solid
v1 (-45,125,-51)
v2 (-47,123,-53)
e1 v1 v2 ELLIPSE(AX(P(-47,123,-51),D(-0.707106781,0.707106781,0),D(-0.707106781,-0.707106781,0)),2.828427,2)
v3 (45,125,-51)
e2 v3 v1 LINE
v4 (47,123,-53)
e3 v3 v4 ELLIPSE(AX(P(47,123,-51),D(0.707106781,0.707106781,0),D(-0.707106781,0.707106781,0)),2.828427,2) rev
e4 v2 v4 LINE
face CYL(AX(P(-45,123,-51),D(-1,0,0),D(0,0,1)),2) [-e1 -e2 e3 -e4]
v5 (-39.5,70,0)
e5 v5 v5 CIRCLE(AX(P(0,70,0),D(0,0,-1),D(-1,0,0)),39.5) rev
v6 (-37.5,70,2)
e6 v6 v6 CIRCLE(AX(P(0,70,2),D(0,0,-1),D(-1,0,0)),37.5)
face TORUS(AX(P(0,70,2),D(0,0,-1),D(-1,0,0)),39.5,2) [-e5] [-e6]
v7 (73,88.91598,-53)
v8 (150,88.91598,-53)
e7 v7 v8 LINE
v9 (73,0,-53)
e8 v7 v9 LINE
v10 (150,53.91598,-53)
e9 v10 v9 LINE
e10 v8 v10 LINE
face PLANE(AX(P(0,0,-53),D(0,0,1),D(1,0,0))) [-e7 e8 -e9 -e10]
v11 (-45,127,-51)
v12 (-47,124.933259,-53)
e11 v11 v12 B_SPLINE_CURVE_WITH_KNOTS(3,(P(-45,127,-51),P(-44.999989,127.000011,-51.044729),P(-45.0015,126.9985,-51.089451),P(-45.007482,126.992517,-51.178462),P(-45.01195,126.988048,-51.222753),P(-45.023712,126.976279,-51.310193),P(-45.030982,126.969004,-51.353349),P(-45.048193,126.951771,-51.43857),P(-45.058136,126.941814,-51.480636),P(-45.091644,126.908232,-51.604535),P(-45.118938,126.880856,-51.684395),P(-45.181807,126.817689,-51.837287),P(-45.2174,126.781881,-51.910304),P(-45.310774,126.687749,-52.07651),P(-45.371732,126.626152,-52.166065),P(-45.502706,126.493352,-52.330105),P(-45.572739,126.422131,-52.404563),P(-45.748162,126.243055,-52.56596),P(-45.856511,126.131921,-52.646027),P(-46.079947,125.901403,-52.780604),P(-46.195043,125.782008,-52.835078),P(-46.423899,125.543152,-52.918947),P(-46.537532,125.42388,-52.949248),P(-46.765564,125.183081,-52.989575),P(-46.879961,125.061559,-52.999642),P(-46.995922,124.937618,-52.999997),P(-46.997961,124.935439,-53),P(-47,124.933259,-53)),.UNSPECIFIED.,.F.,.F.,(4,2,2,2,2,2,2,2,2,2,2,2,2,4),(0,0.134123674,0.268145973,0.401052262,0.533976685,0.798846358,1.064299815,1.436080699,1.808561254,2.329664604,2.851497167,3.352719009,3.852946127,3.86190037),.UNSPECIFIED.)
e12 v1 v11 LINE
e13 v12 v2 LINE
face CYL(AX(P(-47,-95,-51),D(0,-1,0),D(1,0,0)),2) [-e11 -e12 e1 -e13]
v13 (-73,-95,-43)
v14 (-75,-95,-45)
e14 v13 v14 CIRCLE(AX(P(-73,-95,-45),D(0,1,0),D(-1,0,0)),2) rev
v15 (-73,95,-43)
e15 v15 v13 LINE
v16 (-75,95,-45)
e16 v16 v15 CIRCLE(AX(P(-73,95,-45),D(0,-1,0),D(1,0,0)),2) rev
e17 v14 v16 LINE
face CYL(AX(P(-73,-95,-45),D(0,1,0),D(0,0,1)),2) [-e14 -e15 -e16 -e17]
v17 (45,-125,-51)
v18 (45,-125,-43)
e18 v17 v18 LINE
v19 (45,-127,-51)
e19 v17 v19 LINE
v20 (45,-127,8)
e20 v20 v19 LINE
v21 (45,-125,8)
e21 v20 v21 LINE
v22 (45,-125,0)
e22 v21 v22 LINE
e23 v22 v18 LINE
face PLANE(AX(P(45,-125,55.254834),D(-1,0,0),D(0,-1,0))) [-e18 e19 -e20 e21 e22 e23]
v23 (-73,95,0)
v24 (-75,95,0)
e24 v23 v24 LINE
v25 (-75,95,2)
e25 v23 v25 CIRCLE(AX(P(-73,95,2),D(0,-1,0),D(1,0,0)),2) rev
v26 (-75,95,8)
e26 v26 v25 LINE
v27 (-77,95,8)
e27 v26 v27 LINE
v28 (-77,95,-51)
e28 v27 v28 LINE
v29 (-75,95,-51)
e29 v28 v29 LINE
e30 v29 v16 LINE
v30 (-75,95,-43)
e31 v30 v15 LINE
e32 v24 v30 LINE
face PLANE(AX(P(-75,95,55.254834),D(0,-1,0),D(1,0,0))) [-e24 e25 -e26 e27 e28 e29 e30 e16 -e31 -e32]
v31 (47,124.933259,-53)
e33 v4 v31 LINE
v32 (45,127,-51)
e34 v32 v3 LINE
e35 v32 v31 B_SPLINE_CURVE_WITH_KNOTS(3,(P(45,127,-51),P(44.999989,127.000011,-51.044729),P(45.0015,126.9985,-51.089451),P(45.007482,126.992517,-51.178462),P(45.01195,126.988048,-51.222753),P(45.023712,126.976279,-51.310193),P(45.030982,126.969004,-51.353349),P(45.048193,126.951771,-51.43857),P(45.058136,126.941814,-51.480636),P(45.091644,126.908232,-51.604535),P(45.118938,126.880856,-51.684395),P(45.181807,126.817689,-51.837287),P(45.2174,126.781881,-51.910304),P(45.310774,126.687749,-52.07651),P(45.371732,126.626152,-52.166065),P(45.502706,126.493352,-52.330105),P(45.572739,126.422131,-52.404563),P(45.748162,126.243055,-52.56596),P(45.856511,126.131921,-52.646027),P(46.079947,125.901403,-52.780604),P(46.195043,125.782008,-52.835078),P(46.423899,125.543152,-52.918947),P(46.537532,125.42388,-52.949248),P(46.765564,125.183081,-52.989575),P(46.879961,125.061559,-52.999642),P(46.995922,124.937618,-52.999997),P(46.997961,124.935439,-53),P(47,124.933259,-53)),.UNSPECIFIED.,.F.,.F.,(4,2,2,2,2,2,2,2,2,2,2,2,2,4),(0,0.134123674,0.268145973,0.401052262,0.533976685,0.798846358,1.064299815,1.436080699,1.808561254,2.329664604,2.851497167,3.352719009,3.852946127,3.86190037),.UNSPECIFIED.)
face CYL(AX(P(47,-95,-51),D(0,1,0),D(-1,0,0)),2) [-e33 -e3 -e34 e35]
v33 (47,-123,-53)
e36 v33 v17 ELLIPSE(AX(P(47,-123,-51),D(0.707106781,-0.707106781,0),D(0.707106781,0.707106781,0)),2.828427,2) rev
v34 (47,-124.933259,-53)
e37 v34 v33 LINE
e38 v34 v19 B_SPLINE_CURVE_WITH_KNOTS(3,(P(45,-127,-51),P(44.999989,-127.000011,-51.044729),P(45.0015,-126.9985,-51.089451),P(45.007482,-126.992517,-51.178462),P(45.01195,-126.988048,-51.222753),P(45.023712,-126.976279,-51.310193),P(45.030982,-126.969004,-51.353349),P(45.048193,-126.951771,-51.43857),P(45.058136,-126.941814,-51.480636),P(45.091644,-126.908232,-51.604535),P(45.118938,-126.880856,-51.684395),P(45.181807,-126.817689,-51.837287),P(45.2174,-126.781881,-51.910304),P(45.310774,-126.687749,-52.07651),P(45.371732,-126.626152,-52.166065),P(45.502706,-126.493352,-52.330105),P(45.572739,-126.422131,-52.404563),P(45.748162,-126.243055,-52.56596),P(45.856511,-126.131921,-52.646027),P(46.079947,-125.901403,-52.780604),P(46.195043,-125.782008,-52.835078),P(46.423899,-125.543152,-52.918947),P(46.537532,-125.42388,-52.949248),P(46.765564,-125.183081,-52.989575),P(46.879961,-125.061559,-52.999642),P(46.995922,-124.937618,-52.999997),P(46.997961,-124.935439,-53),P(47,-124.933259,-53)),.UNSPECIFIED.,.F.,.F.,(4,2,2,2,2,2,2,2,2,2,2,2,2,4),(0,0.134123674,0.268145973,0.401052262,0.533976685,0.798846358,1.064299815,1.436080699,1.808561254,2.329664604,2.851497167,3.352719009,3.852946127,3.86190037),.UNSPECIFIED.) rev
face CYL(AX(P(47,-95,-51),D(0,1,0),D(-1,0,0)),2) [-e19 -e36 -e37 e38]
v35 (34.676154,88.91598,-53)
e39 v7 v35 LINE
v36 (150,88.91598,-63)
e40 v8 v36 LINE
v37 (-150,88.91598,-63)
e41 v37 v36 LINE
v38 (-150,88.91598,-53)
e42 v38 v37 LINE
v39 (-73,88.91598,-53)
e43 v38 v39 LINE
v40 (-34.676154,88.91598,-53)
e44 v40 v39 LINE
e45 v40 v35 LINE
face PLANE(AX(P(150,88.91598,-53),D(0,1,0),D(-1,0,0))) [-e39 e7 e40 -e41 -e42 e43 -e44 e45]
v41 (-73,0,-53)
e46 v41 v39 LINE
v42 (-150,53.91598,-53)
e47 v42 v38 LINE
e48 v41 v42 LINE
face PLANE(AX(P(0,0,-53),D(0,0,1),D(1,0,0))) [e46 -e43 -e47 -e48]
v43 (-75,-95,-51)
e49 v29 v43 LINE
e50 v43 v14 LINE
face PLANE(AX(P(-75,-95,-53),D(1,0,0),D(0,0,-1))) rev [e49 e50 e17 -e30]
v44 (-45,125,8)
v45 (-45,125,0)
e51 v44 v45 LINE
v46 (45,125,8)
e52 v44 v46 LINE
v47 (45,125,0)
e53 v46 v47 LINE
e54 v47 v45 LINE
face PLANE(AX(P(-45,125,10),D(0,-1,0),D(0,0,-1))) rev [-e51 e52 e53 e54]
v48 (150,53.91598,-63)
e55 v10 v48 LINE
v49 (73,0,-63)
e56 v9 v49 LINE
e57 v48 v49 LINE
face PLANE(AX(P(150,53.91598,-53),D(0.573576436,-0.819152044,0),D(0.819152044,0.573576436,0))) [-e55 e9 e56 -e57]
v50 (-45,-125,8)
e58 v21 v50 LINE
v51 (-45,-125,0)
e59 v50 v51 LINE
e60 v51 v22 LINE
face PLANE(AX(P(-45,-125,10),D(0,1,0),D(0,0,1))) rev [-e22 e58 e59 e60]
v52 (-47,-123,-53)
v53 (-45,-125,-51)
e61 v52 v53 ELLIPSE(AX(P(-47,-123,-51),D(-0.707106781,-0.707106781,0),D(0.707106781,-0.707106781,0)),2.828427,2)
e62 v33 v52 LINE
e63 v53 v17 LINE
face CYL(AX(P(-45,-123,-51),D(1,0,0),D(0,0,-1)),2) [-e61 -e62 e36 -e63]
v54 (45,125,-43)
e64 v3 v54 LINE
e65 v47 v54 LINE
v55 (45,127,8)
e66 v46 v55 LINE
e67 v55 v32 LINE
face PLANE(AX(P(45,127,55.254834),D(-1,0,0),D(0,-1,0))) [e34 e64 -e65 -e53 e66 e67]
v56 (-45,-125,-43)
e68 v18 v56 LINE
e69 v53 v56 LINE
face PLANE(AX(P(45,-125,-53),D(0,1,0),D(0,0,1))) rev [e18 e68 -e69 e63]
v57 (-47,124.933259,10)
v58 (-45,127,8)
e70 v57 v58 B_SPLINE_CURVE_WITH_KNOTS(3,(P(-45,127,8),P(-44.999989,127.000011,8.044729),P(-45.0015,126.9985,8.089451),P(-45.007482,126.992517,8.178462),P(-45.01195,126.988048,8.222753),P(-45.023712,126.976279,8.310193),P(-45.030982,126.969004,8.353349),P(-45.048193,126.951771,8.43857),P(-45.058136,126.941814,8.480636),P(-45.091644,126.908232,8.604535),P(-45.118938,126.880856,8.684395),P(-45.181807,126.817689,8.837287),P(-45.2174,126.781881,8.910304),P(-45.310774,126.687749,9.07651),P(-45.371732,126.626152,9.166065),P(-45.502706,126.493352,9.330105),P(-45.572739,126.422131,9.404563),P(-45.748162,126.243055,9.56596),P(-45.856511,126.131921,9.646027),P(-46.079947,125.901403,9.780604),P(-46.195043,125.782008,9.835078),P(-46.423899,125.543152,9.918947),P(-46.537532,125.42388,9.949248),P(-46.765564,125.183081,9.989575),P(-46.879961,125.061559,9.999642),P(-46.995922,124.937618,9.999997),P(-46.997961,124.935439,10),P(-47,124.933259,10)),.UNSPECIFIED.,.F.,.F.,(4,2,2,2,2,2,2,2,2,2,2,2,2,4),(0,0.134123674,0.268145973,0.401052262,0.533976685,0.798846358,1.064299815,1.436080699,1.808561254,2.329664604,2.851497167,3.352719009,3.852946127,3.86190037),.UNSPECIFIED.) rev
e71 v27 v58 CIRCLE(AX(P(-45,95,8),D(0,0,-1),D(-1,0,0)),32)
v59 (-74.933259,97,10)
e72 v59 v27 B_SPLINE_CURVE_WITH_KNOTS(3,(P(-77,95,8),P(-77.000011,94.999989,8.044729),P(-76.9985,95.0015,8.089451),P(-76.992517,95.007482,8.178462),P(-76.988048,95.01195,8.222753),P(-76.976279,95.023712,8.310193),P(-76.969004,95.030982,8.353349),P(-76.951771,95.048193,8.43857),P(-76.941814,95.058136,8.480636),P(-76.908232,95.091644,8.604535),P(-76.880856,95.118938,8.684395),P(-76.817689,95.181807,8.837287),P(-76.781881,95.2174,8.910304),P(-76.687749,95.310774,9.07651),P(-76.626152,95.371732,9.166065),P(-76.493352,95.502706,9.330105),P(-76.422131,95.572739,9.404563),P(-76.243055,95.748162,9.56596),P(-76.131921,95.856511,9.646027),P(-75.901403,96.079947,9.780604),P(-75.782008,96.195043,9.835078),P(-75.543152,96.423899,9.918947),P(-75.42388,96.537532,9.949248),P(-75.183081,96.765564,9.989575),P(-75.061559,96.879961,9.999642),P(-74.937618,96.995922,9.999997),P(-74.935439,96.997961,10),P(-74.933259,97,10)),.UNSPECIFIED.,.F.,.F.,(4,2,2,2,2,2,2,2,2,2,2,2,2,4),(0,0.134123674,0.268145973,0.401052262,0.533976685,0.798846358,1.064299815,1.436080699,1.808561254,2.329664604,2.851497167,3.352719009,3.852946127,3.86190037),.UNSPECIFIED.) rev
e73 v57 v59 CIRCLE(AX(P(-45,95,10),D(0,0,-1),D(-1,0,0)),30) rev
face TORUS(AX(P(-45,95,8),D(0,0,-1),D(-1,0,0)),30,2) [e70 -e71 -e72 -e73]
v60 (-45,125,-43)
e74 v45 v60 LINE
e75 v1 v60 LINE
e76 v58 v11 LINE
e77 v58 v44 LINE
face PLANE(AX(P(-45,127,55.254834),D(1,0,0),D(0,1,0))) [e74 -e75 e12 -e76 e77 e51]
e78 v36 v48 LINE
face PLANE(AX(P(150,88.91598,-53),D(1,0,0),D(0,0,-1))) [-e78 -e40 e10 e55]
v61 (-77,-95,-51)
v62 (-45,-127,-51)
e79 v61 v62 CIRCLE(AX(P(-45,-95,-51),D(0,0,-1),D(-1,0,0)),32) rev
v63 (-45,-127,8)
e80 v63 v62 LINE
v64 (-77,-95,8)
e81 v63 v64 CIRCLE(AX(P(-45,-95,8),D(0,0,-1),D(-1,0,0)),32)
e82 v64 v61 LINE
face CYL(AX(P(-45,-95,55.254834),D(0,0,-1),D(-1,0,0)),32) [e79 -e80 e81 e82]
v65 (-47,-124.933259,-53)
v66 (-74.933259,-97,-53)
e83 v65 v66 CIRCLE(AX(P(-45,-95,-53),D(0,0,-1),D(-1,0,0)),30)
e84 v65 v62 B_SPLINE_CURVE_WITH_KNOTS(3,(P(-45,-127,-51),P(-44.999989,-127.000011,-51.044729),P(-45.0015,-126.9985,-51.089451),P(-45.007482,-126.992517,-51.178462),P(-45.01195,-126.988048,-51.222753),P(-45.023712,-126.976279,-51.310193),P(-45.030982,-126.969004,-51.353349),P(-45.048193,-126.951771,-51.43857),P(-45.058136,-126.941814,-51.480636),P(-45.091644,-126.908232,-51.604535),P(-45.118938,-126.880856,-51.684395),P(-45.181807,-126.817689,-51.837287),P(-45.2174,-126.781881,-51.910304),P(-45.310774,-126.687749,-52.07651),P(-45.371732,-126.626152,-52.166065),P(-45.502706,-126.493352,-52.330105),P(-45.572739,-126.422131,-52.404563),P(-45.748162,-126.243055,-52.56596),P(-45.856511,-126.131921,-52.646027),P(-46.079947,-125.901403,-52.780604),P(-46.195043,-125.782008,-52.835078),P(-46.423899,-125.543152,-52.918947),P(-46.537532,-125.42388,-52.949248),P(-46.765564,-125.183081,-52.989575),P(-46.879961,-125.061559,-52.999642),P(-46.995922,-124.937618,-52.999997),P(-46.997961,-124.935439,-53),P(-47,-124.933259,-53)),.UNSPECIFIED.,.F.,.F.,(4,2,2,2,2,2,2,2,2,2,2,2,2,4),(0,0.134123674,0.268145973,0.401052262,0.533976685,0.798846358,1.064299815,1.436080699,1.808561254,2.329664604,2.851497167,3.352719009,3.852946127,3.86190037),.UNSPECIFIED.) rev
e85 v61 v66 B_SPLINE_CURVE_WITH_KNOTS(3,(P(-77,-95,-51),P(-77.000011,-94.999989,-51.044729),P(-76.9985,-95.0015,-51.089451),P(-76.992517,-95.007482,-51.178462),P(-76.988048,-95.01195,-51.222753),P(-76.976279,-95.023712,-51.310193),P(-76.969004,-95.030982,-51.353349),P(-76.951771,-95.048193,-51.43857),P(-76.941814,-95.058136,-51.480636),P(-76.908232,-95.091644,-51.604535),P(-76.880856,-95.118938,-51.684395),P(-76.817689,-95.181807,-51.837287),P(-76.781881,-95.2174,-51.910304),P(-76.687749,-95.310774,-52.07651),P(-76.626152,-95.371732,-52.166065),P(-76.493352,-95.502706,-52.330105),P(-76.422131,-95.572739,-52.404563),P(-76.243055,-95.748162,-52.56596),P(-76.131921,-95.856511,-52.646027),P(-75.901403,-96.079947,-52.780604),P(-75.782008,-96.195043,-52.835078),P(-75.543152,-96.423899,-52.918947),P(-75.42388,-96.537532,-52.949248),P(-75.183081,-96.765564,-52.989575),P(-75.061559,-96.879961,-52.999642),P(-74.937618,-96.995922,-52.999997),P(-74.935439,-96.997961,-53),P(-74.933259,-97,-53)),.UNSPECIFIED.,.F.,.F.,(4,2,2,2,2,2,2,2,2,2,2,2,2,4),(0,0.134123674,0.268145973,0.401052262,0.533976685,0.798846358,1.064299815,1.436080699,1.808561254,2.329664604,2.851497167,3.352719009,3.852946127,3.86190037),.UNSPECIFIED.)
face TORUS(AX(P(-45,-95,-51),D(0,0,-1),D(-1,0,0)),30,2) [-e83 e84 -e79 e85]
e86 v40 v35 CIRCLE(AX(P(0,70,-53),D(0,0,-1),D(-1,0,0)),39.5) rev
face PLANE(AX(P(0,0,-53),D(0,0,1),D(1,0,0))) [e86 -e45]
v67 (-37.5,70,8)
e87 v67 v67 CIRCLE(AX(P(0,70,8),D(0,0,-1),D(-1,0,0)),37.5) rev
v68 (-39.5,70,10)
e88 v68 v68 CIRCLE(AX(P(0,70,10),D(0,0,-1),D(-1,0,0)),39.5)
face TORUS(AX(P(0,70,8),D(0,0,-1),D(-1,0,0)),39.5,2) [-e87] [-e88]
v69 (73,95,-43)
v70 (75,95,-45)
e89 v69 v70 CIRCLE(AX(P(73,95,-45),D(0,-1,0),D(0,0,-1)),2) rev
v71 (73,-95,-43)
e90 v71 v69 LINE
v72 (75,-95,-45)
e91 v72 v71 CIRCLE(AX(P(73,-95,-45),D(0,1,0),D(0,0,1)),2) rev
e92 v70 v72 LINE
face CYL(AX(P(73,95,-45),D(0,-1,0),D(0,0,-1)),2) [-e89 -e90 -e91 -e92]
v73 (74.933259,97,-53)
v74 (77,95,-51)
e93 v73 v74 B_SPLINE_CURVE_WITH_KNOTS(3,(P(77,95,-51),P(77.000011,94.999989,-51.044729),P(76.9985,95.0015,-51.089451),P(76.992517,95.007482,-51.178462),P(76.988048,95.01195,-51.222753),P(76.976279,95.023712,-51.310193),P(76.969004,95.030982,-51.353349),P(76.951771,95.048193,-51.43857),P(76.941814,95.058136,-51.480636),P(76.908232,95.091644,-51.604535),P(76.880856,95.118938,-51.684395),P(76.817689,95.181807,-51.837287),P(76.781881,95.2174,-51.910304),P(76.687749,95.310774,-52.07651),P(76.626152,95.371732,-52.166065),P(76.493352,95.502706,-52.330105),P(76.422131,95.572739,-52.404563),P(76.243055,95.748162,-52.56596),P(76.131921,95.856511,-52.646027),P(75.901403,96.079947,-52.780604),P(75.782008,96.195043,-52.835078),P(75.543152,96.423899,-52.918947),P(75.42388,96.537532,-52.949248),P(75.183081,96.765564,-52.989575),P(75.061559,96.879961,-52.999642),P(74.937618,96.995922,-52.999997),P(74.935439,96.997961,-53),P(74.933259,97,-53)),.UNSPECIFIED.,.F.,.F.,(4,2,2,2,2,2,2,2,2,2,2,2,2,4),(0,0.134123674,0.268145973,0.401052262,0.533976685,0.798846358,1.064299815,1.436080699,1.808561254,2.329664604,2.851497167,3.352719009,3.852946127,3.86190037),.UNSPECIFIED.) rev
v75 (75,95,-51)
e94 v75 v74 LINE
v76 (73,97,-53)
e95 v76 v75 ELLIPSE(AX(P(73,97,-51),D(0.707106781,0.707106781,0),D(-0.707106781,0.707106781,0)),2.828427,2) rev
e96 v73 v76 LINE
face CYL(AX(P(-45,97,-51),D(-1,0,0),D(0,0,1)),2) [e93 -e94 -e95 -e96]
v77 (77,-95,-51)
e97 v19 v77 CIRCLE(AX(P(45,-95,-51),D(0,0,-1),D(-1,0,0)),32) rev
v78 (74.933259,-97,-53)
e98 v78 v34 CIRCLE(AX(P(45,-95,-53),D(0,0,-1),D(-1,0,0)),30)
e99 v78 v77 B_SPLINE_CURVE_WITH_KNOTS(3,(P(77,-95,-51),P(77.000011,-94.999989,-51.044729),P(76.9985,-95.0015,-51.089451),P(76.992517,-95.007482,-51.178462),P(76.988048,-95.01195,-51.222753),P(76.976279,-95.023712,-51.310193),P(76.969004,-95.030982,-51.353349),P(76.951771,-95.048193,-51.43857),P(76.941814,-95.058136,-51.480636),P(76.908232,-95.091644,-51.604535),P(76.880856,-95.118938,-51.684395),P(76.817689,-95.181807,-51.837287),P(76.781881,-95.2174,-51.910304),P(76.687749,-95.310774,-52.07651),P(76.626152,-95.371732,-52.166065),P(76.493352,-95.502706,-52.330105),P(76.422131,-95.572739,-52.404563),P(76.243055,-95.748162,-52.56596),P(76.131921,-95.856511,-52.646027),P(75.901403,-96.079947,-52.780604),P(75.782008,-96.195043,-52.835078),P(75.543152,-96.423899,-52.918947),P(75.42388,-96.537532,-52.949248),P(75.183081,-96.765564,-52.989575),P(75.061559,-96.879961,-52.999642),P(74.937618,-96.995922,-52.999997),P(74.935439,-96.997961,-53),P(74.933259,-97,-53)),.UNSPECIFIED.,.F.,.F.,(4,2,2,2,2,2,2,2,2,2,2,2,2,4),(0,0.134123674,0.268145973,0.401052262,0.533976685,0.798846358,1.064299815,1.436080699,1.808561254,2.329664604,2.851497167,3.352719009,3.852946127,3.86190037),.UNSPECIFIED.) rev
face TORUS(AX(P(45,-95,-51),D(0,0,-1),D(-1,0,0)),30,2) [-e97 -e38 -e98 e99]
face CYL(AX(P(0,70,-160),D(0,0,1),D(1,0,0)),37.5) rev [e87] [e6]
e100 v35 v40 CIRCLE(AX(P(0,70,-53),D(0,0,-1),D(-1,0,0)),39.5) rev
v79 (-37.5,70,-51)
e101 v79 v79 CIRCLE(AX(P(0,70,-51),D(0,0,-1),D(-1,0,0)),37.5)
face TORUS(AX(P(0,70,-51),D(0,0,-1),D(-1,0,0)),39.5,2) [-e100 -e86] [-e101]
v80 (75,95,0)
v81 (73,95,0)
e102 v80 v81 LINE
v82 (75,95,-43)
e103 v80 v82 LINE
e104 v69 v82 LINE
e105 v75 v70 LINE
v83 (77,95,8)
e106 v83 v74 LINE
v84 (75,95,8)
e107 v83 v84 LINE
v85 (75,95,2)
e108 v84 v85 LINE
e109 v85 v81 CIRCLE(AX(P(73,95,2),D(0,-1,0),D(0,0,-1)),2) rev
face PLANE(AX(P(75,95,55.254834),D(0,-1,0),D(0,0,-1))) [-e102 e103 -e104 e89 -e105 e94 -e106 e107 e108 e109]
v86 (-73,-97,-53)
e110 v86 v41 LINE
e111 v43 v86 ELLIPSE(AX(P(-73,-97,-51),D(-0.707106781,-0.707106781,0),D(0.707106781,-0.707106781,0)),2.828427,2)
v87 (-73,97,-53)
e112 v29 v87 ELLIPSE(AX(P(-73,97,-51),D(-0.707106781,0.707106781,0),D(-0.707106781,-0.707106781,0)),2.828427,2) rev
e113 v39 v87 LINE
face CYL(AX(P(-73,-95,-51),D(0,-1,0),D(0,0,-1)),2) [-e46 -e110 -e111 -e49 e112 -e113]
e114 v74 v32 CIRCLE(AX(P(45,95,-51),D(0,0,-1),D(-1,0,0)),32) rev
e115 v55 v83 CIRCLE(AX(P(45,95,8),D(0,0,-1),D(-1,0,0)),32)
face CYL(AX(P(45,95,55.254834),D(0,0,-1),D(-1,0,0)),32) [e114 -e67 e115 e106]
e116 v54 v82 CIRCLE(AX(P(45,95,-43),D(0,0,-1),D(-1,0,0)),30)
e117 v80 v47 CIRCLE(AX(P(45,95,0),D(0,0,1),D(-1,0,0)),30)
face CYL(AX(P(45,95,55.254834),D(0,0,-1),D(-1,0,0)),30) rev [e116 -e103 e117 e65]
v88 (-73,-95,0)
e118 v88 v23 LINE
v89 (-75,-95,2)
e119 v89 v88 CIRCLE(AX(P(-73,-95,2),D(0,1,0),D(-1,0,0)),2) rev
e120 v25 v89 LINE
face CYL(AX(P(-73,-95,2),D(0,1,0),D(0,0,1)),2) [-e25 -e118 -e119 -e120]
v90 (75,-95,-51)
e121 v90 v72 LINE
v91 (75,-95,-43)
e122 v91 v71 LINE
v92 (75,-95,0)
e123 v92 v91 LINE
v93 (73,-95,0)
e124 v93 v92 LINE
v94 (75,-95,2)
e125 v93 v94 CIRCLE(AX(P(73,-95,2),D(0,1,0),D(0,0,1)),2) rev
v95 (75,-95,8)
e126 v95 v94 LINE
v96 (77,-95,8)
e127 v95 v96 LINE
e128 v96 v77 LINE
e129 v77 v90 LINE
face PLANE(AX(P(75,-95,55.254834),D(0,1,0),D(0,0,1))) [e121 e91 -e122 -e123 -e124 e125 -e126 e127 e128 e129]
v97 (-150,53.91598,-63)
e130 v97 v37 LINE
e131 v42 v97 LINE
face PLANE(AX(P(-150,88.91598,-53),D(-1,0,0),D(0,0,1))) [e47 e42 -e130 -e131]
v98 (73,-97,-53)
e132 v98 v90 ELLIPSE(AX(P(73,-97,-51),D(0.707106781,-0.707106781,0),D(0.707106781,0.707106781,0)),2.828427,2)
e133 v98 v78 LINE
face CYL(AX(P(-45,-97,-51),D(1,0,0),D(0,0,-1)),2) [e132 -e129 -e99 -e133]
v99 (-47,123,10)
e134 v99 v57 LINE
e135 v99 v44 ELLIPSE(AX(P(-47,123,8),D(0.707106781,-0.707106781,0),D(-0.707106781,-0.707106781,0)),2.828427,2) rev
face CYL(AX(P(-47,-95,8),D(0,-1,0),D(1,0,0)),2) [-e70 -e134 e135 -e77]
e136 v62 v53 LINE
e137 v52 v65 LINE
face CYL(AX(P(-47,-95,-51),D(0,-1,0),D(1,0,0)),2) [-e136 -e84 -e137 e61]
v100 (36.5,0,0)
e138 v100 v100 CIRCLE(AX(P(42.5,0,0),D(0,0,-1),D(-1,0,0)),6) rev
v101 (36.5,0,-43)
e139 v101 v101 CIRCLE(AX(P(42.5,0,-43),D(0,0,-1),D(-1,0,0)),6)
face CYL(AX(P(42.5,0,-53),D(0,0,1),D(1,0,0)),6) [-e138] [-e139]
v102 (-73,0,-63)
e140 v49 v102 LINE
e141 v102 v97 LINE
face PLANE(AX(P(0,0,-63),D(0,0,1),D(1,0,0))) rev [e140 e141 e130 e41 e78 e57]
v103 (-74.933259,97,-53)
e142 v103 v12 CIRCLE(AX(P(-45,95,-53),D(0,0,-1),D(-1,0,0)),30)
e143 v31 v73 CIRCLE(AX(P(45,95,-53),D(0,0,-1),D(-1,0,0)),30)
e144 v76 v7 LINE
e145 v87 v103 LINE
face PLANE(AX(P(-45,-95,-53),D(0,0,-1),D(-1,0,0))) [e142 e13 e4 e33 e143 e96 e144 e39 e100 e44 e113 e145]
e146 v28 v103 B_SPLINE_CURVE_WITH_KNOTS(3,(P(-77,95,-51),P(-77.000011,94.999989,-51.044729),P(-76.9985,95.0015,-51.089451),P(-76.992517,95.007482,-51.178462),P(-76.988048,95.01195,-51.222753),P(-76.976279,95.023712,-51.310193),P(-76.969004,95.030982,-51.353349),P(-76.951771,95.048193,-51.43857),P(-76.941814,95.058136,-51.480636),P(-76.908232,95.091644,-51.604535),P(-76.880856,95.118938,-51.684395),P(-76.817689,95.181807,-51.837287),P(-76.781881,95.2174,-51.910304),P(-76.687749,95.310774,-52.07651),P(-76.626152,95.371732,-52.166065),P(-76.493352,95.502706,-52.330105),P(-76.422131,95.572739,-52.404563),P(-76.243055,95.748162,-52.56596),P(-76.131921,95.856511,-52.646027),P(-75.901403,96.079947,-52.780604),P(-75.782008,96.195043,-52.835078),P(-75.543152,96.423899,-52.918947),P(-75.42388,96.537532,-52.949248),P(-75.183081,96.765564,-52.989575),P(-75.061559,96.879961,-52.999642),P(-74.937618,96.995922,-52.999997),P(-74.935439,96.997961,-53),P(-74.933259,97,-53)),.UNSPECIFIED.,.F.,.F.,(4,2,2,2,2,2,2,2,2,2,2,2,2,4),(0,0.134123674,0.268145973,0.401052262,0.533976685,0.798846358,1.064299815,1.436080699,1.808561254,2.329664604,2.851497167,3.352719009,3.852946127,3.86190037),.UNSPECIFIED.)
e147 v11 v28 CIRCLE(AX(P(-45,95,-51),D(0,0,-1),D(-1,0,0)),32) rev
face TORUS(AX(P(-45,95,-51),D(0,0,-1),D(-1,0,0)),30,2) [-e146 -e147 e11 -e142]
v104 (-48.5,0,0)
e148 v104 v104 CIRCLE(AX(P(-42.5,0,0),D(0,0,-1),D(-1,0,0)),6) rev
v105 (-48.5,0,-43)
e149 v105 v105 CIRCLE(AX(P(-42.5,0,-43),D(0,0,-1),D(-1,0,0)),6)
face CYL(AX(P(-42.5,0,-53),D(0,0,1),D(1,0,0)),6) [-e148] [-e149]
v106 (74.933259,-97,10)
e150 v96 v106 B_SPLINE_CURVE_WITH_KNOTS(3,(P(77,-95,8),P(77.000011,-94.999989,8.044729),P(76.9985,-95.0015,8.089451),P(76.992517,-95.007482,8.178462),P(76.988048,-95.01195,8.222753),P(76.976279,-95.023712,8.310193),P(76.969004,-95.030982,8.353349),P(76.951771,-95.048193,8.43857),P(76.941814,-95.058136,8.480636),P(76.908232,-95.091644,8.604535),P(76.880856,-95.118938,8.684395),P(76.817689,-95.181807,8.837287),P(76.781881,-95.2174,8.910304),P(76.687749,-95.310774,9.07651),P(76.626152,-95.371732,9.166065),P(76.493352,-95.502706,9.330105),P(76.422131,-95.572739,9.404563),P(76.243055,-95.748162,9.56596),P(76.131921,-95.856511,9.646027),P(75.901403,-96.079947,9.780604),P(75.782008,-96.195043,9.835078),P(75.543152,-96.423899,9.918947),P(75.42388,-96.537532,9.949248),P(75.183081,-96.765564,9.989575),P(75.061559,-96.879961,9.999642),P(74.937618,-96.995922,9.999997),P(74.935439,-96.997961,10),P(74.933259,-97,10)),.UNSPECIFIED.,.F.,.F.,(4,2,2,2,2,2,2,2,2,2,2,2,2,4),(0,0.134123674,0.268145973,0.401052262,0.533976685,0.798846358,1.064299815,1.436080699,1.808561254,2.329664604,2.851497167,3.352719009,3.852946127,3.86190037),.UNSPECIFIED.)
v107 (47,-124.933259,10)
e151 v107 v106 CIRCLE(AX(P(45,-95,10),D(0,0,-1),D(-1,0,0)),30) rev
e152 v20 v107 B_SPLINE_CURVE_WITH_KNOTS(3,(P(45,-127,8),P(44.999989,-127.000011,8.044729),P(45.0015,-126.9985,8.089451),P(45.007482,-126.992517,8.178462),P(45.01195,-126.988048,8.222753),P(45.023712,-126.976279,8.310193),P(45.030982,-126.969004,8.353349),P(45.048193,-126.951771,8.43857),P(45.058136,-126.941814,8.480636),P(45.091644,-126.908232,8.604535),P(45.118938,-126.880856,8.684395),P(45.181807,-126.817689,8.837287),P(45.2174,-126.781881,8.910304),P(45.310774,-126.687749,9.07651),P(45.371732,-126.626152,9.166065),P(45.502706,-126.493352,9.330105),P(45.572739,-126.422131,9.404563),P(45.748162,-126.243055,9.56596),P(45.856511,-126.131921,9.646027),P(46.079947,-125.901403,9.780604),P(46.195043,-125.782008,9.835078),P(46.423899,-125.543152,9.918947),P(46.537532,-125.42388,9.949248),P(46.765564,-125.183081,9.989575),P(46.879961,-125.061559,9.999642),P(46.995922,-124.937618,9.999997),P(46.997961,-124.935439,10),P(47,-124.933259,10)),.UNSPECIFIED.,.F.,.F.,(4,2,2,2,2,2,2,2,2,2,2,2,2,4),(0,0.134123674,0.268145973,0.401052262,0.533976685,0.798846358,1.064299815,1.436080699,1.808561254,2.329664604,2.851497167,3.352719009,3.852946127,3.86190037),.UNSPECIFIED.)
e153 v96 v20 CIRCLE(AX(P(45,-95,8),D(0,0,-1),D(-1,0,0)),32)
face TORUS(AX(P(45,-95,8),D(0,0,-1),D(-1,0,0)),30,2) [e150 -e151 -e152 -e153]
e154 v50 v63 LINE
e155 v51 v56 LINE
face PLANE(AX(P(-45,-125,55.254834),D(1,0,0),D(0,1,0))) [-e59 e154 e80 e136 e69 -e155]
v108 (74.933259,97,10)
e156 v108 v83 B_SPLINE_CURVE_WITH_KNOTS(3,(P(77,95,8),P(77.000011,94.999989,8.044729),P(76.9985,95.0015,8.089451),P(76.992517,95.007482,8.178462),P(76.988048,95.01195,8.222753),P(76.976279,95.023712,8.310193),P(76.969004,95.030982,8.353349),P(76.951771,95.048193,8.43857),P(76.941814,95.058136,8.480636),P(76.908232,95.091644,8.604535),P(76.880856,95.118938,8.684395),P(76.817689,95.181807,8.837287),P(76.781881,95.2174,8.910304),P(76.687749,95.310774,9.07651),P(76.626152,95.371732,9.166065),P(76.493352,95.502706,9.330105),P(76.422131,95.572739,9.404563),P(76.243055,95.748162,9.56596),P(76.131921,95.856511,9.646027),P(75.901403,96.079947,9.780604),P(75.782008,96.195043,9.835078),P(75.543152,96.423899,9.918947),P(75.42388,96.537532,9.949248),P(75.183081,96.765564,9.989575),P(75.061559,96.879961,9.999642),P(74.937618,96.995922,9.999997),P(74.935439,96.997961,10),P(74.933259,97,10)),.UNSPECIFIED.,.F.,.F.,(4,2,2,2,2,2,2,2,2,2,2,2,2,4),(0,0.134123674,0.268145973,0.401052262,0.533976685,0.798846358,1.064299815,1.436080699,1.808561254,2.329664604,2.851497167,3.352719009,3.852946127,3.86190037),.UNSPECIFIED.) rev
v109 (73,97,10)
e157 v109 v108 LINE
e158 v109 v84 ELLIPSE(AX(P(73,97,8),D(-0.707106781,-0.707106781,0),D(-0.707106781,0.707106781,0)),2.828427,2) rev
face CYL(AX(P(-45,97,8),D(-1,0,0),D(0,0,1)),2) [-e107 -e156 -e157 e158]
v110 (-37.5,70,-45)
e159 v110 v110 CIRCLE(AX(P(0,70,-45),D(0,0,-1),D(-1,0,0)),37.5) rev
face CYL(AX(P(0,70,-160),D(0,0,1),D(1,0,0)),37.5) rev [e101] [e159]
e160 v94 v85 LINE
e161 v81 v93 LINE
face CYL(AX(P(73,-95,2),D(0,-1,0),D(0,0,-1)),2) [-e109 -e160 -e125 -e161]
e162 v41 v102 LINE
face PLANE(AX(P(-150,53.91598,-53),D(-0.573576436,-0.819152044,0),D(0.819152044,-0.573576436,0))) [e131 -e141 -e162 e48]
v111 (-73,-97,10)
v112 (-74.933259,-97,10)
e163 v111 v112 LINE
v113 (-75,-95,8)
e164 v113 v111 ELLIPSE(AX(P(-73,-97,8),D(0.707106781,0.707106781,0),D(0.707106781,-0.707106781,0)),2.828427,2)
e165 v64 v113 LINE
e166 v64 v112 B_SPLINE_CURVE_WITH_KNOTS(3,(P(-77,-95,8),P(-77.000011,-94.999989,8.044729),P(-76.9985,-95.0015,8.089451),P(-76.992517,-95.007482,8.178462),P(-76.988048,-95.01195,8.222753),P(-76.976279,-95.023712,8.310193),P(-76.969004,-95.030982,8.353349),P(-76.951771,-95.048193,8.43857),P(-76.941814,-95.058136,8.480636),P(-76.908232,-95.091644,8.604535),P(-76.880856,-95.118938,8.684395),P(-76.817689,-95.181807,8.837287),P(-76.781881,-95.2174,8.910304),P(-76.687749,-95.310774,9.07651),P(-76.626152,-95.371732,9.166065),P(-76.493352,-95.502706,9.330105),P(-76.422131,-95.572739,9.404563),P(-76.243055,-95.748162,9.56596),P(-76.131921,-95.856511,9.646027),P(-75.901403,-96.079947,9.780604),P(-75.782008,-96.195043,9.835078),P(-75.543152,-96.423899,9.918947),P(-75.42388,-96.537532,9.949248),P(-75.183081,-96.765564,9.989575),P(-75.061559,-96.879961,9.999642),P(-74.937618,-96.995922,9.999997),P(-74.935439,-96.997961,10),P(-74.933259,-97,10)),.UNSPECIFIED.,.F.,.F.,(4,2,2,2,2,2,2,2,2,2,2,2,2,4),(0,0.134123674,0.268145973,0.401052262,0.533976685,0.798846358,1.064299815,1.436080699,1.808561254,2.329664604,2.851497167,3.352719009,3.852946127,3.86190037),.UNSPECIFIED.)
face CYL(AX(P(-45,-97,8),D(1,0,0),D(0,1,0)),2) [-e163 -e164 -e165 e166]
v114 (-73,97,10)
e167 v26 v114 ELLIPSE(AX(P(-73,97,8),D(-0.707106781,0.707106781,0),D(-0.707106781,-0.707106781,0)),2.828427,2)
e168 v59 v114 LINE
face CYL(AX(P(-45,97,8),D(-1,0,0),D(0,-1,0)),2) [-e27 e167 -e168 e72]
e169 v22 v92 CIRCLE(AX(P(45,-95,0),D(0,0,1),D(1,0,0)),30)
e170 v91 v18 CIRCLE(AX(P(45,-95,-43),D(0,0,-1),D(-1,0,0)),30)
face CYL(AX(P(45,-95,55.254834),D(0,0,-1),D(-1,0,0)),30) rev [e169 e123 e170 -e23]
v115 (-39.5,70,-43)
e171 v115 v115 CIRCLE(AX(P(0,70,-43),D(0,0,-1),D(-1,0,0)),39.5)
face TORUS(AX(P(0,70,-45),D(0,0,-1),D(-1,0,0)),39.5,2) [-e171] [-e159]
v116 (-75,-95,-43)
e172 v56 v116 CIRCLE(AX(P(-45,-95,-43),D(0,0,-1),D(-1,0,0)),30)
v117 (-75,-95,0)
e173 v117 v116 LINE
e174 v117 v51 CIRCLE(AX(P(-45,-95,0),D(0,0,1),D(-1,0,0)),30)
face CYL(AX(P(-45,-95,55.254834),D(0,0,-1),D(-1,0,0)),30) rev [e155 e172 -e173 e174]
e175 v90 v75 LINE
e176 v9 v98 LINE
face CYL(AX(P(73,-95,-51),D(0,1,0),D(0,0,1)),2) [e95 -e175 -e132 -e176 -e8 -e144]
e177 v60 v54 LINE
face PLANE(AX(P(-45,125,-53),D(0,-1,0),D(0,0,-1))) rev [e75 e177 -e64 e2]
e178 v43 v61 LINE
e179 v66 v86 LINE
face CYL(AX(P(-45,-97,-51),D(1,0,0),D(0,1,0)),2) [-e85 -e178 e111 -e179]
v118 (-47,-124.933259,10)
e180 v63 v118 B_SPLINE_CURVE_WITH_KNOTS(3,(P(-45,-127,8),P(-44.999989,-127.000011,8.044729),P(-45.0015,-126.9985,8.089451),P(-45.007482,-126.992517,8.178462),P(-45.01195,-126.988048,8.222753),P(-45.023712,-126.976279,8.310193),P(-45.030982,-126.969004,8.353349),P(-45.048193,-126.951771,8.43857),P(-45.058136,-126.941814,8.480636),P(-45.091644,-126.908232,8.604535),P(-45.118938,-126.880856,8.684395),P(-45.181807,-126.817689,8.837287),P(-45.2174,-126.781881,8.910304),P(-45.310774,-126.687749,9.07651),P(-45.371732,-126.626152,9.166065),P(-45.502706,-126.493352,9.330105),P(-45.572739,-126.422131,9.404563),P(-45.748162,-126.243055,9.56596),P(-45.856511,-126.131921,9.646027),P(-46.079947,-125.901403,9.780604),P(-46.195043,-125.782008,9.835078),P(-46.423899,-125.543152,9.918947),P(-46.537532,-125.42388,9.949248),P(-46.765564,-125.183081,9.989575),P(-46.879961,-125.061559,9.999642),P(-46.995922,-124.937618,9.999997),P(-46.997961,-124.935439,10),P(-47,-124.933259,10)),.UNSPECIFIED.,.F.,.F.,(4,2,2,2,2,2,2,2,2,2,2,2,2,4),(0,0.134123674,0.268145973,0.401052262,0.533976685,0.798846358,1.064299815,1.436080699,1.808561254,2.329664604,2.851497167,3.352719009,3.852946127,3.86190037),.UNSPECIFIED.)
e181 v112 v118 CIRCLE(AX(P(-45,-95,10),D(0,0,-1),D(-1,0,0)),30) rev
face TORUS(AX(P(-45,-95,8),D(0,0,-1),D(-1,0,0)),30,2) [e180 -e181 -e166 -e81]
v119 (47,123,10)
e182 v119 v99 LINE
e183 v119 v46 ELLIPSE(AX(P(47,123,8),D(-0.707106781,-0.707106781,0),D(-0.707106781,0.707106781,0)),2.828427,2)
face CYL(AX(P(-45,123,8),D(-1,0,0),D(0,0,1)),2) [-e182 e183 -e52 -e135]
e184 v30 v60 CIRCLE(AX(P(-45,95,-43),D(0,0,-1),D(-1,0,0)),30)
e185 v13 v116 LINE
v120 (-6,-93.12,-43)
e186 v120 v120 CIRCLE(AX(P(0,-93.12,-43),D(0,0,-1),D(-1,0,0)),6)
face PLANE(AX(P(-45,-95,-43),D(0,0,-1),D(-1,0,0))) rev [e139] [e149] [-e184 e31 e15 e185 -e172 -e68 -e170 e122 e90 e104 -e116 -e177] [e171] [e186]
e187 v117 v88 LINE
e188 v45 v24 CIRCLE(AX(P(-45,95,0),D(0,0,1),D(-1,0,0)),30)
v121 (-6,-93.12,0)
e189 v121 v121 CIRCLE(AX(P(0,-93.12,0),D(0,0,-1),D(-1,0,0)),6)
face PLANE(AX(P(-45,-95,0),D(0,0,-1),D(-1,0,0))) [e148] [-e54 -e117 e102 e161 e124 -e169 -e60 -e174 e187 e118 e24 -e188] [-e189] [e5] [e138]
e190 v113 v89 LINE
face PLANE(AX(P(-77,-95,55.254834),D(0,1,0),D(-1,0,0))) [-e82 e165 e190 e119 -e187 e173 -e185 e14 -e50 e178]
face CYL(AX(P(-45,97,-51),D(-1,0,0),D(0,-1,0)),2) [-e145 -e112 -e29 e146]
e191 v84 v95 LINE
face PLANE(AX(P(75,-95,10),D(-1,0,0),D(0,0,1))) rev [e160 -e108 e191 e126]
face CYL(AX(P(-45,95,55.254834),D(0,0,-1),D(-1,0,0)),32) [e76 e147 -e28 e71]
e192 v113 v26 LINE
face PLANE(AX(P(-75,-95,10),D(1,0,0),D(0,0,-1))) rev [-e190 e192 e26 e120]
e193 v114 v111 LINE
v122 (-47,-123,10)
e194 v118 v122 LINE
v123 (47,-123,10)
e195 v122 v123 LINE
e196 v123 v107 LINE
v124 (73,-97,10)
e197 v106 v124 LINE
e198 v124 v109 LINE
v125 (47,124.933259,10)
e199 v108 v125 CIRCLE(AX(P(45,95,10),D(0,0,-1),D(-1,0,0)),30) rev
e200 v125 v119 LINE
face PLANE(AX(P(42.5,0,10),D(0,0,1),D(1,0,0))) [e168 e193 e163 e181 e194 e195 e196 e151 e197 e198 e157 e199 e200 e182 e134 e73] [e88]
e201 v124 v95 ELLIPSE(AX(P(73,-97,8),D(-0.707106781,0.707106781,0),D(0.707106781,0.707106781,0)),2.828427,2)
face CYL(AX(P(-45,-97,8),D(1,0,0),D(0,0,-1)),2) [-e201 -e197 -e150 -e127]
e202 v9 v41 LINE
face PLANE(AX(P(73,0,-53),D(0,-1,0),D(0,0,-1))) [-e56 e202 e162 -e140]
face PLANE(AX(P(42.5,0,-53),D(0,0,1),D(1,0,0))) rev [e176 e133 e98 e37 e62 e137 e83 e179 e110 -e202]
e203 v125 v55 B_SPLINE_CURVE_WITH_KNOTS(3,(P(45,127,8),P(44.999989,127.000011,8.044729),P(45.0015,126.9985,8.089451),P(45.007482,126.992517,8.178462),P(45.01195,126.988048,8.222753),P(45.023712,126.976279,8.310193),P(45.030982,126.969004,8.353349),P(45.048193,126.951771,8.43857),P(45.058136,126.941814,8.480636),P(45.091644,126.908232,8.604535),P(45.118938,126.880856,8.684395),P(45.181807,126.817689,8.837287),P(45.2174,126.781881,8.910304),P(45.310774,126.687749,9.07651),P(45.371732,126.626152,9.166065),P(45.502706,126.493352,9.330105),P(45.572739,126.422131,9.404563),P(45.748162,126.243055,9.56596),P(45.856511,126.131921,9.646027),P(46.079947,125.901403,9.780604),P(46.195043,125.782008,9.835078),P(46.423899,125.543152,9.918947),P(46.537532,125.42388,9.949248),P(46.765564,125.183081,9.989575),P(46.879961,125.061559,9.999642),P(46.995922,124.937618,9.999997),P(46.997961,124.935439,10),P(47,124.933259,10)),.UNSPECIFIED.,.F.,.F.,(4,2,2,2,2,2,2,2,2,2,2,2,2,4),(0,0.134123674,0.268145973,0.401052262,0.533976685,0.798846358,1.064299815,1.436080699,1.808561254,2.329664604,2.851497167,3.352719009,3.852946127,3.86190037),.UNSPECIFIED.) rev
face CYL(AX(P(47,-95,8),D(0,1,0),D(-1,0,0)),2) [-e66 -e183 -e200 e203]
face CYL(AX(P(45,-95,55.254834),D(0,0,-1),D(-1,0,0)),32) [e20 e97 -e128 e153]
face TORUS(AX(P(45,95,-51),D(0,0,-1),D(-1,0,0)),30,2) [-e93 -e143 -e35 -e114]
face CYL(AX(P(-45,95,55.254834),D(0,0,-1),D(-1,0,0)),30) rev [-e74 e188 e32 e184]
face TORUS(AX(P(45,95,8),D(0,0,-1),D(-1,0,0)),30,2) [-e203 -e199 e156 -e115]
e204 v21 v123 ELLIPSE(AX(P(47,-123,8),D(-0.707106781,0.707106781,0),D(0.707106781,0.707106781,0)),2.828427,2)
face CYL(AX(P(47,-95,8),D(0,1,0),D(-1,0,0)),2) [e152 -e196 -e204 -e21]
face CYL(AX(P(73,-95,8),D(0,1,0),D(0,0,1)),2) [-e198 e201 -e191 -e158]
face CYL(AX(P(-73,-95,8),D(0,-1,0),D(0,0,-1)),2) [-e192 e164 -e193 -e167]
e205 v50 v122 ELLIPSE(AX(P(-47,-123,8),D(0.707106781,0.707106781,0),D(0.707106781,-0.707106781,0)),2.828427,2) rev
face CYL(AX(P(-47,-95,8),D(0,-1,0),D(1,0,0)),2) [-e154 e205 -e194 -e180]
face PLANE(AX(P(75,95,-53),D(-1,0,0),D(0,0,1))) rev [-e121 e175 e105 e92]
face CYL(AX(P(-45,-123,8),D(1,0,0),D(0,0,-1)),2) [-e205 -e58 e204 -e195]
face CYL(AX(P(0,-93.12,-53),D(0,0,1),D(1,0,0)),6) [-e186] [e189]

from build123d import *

# Parameters (mm, degrees)
BOSS_EXTRUDE1_DEPTH       = 10
BOSS_EXTRUDE2_DEPTH       = 10
SKETCH5_R                 = 37.5
CUT_EXTRUDE1_DEPTH        = 170
FILLET1_R                 = 2
FILLET2_R                 = 2
BOSS_EXTRUDE3_REACH       = 160.805
FILLET3_R                 = 2
FILLET4_R                 = 2
FILLET8_R                 = 2
SKETCH8_R                 = 6
CUT_EXTRUDE4_DEPTH        = 101
SKETCH19_R                = 6
BOSS_EXTRUDE11_DEPTH      = 63
BOSS_EXTRUDE11_2_DEPTH    = 63
BOSS_EXTRUDE12_DEPTH      = 43
BOSS_EXTRUDE12_DEPTH_BACK = 10
SKETCH20_R                = 6
BOSS_EXTRUDE13_START      = 63
BOSS_EXTRUDE13_DEPTH      = 10


# Some blends are built 0.0001 mm under size
with BuildPart() as part:
    # Sketch2 → Boss-Extrude1 (new body)
    with BuildSketch(Plane.XY):
        with BuildLine():
            Line((-45, -125), (45, -125))
            ThreePointArc((45, -125), (66.213203436, -116.213203436), (75, -95))
            Line((75, -95), (75, 95))
            ThreePointArc((75, 95), (66.213203436, 116.213203436), (45, 125))
            Line((45, 125), (-45, 125))
            ThreePointArc((-45, 125), (-66.213203436, 116.213203436), (-75, 95))
            Line((-75, 95), (-75, -95))
            ThreePointArc((-75, -95), (-66.213203436, -116.213203436), (-45, -125))
        make_face()
    extrude(amount=BOSS_EXTRUDE1_DEPTH)


with BuildPart() as body_2:
    # Sketch4 → Boss-Extrude2 (new body)
    with BuildSketch(Plane(origin=(0, 0, -43), x_dir=(-1, 0, 0), z_dir=(0, 0, -1))):
        with BuildLine():
            Line((75, -95), (75, 95))
            ThreePointArc((75, 95), (66.213203436, 116.213203436), (45, 125))
            Line((45, 125), (-45, 125))
            ThreePointArc((-45, 125), (-66.213203436, 116.213203436), (-75, 95))
            Line((-75, 95), (-75, -95))
            ThreePointArc((-75, -95), (-66.213203436, -116.213203436), (-45, -125))
            Line((-45, -125), (45, -125))
            ThreePointArc((45, -125), (66.213203436, -116.213203436), (75, -95))
        make_face()
    extrude(amount=BOSS_EXTRUDE2_DEPTH)


with BuildPart() as cut_extrude1_tool:
    # Sketch5 → Cut-Extrude1 (new body)
    with BuildSketch(Plane.XY.offset(10)):
        with Locations((0, 70)):
            Circle(SKETCH5_R)
    extrude(amount=-CUT_EXTRUDE1_DEPTH)


with BuildPart() as part_1:
    add(part.part)

    # Cut-Extrude1: cut by cut_extrude1_tool
    add(cut_extrude1_tool.part, mode=Mode.SUBTRACT)

    # Fillet1
    fillet1_edges = [part_1.edges().sort_by_distance(p)[0] for p in [
        (-37.5, 70, 0),
        (-37.5, 70, 10),
    ]]
    fillet(fillet1_edges, radius=FILLET1_R)

    # Boss-Extrude3: up to this face of the body (flat: up to its plane)
    boss_extrude3_end = Plane(part_1.part.faces().sort_by_distance((0, -10.781104943, 10))[0])
    # Sketch6 → Boss-Extrude3 (add, up to the picked face)
    with BuildSketch(Plane(origin=(0, 0, -53), x_dir=(-1, 0, 0), z_dir=(0, 0, -1)), mode=Mode.PRIVATE) as boss_extrude3_sk1:
        with BuildLine():
            Line((-45, 127), (-45, 125))
            ThreePointArc((-45, 125), (-66.213203436, 116.213203436), (-75, 95))
            Line((-75, 95), (-77, 95))
            ThreePointArc((-77, 95), (-67.627416998, 117.627416998), (-45, 127))
        make_face()
    boss_extrude3_tool1 = split(extrude(boss_extrude3_sk1.sketch, amount=-BOSS_EXTRUDE3_REACH, mode=Mode.PRIVATE), bisect_by=boss_extrude3_end, keep=Keep.BOTH, mode=Mode.PRIVATE)
    # Sketch6 → Boss-Extrude3 (add, up to the picked face)
    with BuildSketch(Plane(origin=(0, 0, -53), x_dir=(-1, 0, 0), z_dir=(0, 0, -1)), mode=Mode.PRIVATE) as boss_extrude3_sk2:
        with BuildLine():
            Line((45, 127), (45, 125))
            ThreePointArc((45, 125), (66.213203436, 116.213203436), (75, 95))
            Line((75, 95), (77, 95))
            ThreePointArc((77, 95), (67.627416998, 117.627416998), (45, 127))
        make_face()
    boss_extrude3_tool2 = split(extrude(boss_extrude3_sk2.sketch, amount=-BOSS_EXTRUDE3_REACH, mode=Mode.PRIVATE), bisect_by=boss_extrude3_end, keep=Keep.BOTH, mode=Mode.PRIVATE)
    # Sketch6 → Boss-Extrude3 (add, up to the picked face)
    with BuildSketch(Plane(origin=(0, 0, -53), x_dir=(-1, 0, 0), z_dir=(0, 0, -1)), mode=Mode.PRIVATE) as boss_extrude3_sk3:
        with BuildLine():
            Line((77, -95), (75, -95))
            ThreePointArc((75, -95), (66.213203436, -116.213203436), (45, -125))
            Line((45, -125), (45, -127))
            ThreePointArc((45, -127), (67.627416998, -117.627416998), (77, -95))
        make_face()
    boss_extrude3_tool3 = split(extrude(boss_extrude3_sk3.sketch, amount=-BOSS_EXTRUDE3_REACH, mode=Mode.PRIVATE), bisect_by=boss_extrude3_end, keep=Keep.BOTH, mode=Mode.PRIVATE)
    # Sketch6 → Boss-Extrude3 (add, up to the picked face)
    with BuildSketch(Plane(origin=(0, 0, -53), x_dir=(-1, 0, 0), z_dir=(0, 0, -1)), mode=Mode.PRIVATE) as boss_extrude3_sk4:
        with BuildLine():
            Line((-75, -95), (-77, -95))
            ThreePointArc((-77, -95), (-67.627416998, -117.627416998), (-45, -127))
            Line((-45, -127), (-45, -125))
            ThreePointArc((-45, -125), (-66.213203436, -116.213203436), (-75, -95))
        make_face()
    boss_extrude3_tool4 = split(extrude(boss_extrude3_sk4.sketch, amount=-BOSS_EXTRUDE3_REACH, mode=Mode.PRIVATE), bisect_by=boss_extrude3_end, keep=Keep.BOTH, mode=Mode.PRIVATE)


with BuildPart() as body_2_1:
    add(body_2.part)

    # Cut-Extrude1: cut by cut_extrude1_tool
    add(cut_extrude1_tool.part, mode=Mode.SUBTRACT)

    # Fillet2
    fillet2_edges = [body_2_1.edges().sort_by_distance(p)[0] for p in [
        (-37.5, 70, -53),
        (-37.5, 70, -43),
    ]]
    fillet(fillet2_edges, radius=FILLET2_R)


with BuildPart() as part_2:
    add(part_1.part)

    add(body_2_1.part)  # Boss-Extrude3 merges body 2
    add(boss_extrude3_tool1.solids().sort_by(Axis((67.307417, 117.307417, -53), (0, 0, 1)))[0])
    add(boss_extrude3_tool2.solids().sort_by(Axis((-67.307417, 117.307417, -53), (0, 0, 1)))[0])
    add(boss_extrude3_tool3.solids().sort_by(Axis((-76, -95.452548, -53), (0, 0, 1)))[0])
    add(boss_extrude3_tool4.solids().sort_by(Axis((76, -95.452548, -53), (0, 0, 1)))[0])

    # Fillet3
    fillet3_edges = [part_2.edges().sort_by_distance(p)[0] for p in [
        (75, 0, 10),
        (0, 125, 10),
        (-75, 0, 10),
        (-76, -95, 10),
        (-67.627416998, -117.627416998, 10),
        (-45, -126, 10),
        (45, -126, 10),
        (67.627416998, -117.627416998, 10),
        (76, -95, 10),
        (-45, 126, 10),
        (-67.627416998, 117.627416998, 10),
        (-76, 95, 10),
        (76, 95, 10),
        (67.627416998, 117.627416998, 10),
        (45, 126, 10),
        (0, -125, 10),
    ]]
    fillet(fillet3_edges, radius=FILLET3_R)

    # Fillet4
    fillet4_edges = [part_2.edges().sort_by_distance(p)[0] for p in [
        (-45, -126, -53),
        (-67.627416998, -117.627416998, -53),
        (-76, -95, -53),
        (-75, 0, -53),
        (0, 125, -53),
        (75, 0, -53),
        (0, -125, -53),
        (76, -95, -53),
        (67.627416998, -117.627416998, -53),
        (45, -126, -53),
        (-76, 95, -53),
        (-67.627416998, 117.627416998, -53),
        (-45, 126, -53),
        (45, 126, -53),
        (67.627416998, 117.627416998, -53),
        (76, 95, -53),
    ]]
    fillet(fillet4_edges, radius=FILLET4_R - 0.0001)  # a hair under: the kernel refuses the full size

    # Fillet8
    # the kernel refuses this fillet: 2 mm, written as the material it takes off along each edge
    with BuildSketch(Plane(origin=(75, -95, 0), x_dir=(-1, 0, 0), z_dir=(0, 1, 0)), Plane(origin=(75, 95, -43), x_dir=(-1, 0, 0), z_dir=(0, -1, 0))) as fillet8_piece_1:
        with BuildLine():
            CenterArc((FILLET8_R, FILLET8_R), FILLET8_R, 180, 90)
            Line((0, FILLET8_R), (0, 0))
            Line((0, 0), (FILLET8_R, 0))
        make_face()
    extrude(amount=190, mode=Mode.SUBTRACT)
    with BuildSketch(Plane(origin=(-75, -95, -43), x_dir=(0, 0, -1), z_dir=(0, 1, 0)), Plane(origin=(-75, 95, 0), x_dir=(0, 0, 1), z_dir=(0, -1, 0))) as fillet8_piece_2:
        with BuildLine():
            CenterArc((FILLET8_R, -FILLET8_R), FILLET8_R, 90, 90)
            Line((0, -FILLET8_R), (0, 0))
            Line((0, 0), (FILLET8_R, 0))
        make_face()
    extrude(amount=190, mode=Mode.SUBTRACT)

    # Sketch8 → Cut-Extrude4 (cut)
    with BuildSketch(Plane.XY.offset(10)):
        with Locations((42.5, 0)):
            Circle(SKETCH8_R)
        with Locations((-42.5, 0)):
            Circle(SKETCH8_R)
    extrude(amount=-CUT_EXTRUDE4_DEPTH, mode=Mode.SUBTRACT)

    # Sketch20 → Boss-Extrude12 (add, two sides: drawn at the far end of the back side and taken through both)
    with BuildSketch(Plane.XY.offset(-43).offset(-BOSS_EXTRUDE12_DEPTH_BACK)):
        with Locations(Location((0, -93.12, 0), (0, 0, 180))):
            Circle(SKETCH20_R)
    extrude(amount=BOSS_EXTRUDE12_DEPTH + BOSS_EXTRUDE12_DEPTH_BACK)



with BuildPart() as body_2_2:
    # Sketch19 → Boss-Extrude11 (new, through all)
    with BuildSketch(Plane.XY.offset(10)):
        with Locations((42.5, 0)):
            Circle(SKETCH19_R)
    extrude(amount=-BOSS_EXTRUDE11_DEPTH)


with BuildPart() as body_3:
    # Sketch19 → Boss-Extrude11 2 (new, through all)
    with BuildSketch(Plane.XY.offset(10)):
        with Locations((-42.5, 0)):
            Circle(SKETCH19_R)
    extrude(amount=-BOSS_EXTRUDE11_2_DEPTH)


with BuildPart() as part_3:
    add(part_2.part)

    add(body_2_2.part)  # Boss-Extrude13 merges body 2 2

    add(body_3.part)  # Boss-Extrude13 merges body 3
    # Sketch21 → Boss-Extrude13 (add)
    with BuildSketch(Plane(origin=(0, 0, 0), x_dir=(-1, 0, 0), z_dir=(0, 0, -1)).offset(BOSS_EXTRUDE13_START)):
        Polygon((150, 88.915980442), (150, 53.915980442), (73, 0), (-73, 0), (-150, 53.915980442), (-150, 88.915980442), align=None)
    extrude(amount=-BOSS_EXTRUDE13_DEPTH)


solid = part_3.part
